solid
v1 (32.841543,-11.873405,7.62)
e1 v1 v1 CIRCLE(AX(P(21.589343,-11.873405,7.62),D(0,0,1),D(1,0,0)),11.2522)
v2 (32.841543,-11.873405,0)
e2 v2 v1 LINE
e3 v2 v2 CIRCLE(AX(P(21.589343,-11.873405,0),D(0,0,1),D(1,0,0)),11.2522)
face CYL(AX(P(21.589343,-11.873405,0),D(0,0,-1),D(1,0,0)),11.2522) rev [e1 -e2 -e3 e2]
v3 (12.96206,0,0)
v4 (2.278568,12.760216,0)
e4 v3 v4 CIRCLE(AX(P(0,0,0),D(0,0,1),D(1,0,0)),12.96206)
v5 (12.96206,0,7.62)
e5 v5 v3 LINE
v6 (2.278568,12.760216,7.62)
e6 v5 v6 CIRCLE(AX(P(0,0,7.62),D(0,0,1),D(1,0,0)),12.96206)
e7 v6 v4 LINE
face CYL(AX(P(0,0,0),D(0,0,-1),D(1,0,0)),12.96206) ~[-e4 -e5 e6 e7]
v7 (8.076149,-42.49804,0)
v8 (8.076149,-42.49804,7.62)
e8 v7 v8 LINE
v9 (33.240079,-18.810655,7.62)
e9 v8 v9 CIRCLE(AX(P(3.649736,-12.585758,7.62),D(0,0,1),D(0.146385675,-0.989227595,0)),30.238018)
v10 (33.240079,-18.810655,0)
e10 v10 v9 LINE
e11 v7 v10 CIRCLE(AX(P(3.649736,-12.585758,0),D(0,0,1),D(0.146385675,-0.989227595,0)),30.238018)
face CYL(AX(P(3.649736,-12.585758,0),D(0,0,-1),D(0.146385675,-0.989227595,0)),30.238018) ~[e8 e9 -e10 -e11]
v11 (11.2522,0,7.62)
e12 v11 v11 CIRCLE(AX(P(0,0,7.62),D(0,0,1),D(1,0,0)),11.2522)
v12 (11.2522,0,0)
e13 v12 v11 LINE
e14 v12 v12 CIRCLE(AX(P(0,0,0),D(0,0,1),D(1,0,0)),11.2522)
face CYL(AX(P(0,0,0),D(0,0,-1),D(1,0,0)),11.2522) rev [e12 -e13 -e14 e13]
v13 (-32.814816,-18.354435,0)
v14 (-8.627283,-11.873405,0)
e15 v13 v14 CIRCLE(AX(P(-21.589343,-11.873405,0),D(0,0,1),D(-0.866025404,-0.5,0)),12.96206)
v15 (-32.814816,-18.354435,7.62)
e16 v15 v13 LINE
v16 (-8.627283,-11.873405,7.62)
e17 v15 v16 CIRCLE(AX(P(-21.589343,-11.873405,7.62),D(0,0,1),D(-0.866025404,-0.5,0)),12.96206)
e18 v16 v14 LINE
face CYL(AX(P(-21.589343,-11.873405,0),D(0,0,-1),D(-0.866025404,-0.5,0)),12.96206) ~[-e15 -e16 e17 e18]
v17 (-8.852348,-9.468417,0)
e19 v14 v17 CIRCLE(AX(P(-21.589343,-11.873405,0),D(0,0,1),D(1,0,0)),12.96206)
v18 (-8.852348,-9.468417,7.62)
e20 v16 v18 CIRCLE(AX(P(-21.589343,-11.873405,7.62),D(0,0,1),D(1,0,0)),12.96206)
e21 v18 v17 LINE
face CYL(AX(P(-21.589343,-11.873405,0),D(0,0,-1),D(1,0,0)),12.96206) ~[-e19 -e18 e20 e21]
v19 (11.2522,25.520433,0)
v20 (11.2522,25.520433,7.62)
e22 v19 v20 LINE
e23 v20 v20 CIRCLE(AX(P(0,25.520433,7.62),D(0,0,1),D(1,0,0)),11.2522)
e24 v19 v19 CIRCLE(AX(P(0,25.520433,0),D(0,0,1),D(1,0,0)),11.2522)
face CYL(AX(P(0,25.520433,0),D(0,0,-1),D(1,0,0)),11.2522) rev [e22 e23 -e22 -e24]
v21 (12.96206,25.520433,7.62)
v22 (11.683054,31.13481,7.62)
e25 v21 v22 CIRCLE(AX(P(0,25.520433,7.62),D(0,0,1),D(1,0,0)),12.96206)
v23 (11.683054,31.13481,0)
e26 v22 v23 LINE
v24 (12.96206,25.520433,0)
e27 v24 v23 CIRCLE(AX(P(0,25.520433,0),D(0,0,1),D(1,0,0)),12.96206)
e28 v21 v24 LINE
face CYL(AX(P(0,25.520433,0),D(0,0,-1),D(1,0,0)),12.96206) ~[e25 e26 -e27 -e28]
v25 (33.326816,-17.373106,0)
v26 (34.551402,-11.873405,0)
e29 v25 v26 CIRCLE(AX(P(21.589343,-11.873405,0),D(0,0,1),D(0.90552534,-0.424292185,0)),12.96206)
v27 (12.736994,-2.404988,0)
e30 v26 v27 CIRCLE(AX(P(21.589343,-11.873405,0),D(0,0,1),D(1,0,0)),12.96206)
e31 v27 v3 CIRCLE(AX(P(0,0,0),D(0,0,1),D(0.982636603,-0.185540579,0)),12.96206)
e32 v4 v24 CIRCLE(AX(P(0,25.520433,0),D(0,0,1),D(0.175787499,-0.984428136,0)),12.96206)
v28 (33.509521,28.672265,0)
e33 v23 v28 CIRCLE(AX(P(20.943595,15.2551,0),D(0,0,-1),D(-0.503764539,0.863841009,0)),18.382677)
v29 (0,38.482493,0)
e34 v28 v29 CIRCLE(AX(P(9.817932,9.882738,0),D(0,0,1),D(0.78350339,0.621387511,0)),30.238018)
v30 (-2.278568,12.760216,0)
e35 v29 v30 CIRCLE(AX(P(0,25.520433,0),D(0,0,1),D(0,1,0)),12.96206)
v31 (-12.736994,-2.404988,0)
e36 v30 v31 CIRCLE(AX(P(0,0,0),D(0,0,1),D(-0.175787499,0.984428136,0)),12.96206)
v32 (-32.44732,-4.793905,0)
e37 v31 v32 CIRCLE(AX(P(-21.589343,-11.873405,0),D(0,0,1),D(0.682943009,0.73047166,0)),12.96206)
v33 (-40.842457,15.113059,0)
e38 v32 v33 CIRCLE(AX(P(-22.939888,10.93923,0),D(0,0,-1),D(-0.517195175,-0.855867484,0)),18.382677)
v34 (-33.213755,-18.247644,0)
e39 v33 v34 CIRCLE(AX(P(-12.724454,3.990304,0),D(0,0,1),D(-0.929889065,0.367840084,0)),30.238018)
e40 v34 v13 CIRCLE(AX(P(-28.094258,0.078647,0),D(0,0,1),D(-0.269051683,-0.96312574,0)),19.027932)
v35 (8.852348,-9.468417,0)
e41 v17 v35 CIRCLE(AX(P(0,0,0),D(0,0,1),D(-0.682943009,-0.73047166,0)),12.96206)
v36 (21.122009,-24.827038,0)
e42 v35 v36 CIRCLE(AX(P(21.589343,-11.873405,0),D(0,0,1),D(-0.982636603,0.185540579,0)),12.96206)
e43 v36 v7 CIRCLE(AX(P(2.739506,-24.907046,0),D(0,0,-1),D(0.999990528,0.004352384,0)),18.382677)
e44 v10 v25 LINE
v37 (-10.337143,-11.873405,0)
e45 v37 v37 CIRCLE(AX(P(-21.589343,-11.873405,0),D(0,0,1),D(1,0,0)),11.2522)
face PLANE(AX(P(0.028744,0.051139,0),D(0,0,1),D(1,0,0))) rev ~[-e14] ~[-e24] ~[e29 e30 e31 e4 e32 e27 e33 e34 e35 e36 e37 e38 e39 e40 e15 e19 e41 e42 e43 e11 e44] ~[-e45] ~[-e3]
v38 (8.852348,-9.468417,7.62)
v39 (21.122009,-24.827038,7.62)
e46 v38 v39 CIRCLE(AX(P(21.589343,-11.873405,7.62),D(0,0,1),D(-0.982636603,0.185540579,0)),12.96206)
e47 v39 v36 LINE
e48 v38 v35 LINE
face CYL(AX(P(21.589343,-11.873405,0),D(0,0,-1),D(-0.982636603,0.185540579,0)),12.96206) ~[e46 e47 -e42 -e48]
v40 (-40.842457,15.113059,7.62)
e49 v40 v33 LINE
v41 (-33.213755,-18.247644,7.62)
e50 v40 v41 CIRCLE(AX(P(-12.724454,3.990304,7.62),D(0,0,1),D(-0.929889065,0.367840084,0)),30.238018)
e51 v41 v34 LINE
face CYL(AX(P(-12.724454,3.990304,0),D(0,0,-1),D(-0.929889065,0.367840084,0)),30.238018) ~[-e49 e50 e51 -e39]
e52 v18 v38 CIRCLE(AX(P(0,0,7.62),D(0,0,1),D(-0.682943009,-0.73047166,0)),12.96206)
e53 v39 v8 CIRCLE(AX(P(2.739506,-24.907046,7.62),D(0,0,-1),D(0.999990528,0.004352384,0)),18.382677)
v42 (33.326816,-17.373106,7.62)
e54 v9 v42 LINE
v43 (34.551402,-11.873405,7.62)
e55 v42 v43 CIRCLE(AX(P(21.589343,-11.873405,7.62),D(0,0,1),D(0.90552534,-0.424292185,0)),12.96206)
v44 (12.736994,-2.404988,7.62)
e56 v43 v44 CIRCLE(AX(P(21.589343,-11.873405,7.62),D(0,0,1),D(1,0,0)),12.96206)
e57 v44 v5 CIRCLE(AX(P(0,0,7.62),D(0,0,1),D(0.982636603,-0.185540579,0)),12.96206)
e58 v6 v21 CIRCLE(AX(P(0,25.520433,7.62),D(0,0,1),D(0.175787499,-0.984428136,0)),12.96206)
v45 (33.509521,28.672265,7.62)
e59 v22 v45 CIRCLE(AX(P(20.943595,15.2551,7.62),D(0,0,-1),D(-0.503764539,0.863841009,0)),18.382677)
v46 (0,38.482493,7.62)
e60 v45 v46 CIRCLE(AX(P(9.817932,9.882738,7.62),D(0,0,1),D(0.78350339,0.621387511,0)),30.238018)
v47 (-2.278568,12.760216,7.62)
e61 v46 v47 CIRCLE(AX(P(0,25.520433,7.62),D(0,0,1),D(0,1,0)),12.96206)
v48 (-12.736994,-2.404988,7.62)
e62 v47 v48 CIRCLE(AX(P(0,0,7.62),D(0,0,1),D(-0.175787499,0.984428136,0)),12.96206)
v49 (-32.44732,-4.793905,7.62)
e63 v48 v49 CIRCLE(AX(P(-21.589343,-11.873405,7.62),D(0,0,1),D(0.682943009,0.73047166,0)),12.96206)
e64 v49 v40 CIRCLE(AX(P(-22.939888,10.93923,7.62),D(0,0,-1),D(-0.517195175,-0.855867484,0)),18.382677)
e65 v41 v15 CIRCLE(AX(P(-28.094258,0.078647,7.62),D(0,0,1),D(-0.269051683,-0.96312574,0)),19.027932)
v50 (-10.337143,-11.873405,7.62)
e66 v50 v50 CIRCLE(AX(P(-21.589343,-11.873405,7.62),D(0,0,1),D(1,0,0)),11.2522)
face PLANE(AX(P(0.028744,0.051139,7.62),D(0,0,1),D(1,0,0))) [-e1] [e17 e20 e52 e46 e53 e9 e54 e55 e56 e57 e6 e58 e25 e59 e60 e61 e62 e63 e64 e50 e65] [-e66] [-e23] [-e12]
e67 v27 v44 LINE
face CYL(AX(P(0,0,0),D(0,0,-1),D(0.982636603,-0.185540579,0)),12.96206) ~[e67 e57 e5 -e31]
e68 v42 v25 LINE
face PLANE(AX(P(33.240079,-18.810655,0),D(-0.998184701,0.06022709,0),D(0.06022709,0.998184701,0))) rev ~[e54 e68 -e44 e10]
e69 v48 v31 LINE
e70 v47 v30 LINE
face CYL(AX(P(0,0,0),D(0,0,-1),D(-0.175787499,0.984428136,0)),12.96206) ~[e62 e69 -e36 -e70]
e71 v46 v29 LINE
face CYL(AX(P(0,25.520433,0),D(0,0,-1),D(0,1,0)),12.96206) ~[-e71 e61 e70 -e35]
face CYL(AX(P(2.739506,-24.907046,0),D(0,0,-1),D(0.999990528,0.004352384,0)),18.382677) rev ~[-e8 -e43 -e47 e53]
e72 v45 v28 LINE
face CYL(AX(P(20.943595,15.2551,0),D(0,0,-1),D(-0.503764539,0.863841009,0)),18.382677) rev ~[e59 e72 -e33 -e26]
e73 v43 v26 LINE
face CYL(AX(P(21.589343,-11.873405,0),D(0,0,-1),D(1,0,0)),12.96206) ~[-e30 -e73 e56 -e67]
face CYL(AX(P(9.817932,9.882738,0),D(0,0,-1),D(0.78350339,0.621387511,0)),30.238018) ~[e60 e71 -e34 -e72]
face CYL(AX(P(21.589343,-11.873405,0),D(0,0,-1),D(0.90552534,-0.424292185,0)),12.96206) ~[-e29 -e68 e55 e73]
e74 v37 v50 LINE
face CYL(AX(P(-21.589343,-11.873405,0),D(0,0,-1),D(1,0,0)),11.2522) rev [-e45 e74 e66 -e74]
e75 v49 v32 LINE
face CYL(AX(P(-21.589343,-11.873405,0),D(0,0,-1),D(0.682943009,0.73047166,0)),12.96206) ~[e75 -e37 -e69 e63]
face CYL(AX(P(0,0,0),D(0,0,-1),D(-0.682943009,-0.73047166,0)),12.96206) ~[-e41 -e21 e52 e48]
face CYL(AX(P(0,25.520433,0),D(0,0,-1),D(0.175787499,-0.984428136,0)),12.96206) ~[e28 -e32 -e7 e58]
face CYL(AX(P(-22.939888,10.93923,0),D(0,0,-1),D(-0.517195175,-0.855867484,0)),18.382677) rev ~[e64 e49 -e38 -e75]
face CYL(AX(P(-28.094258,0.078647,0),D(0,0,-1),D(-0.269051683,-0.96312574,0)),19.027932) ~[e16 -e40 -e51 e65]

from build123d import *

# Parameters (mm, degrees)
F0_R     = 11.2522
F1_DEPTH = 7.62
F2_DEPTH = 5.334


with BuildPart() as f1:
    # F0 (on Top) → F1 (new body)
    with BuildSketch(Plane.XY):
        with BuildLine():
            ThreePointArc((12.7369944105, -2.4049880816), (12.9056707985, -1.2077481218), (12.962059801, 0))
            ThreePointArc((12.962059801, 0), (9.9385595014, 8.321059387), (2.2785680744, 12.7602163702))
            ThreePointArc((2.2785680744, 12.7602163702), (0, 12.5583729394), (-2.2785680744, 12.7602163702))
            ThreePointArc((-2.2785680744, 12.7602163702), (-10.6706436404, 7.3588286149), (-12.7369944105, -2.4049880816))
            ThreePointArc((-12.7369944105, -2.4049880816), (-10.231616704, -5.6270418202), (-8.8523481214, -9.4684173452))
            ThreePointArc((-8.8523481214, -9.4684173452), (0, -12.962059801), (8.8523481214, -9.4684173452))
            ThreePointArc((8.8523481214, -9.4684173452), (10.231616704, -5.6270418202), (12.7369944105, -2.4049880816))
        make_face()
        Circle(F0_R, mode=Mode.SUBTRACT)
        with BuildLine():
            ThreePointArc((-2.2785680744, 12.7602163702), (0, 12.5583729394), (2.2785680744, 12.7602163702))
            ThreePointArc((2.2785680744, 12.7602163702), (0, 12.962059801), (-2.2785680744, 12.7602163702))
        make_face()
        with BuildLine():
            ThreePointArc((-2.2785680744, 12.7602163702), (0, 12.962059801), (2.2785680744, 12.7602163702))
            ThreePointArc((2.2785680744, 12.7602163702), (9.9385595014, 17.1993733535), (12.962059801, 25.5204327404))
            ThreePointArc((12.962059801, 25.5204327404), (12.6382642104, 28.3995423305), (11.6830544332, 31.1348101232))
            ThreePointArc((11.6830544332, 31.1348101232), (6.9007644107, 36.492872981), (0, 38.4824925414))
            ThreePointArc((0, 38.4824925414), (-12.9115003379, 26.6641780399), (-2.2785680744, 12.7602163702))
        make_face()
        with Locations((0, 25.5204327404)):
            Circle(F0_R, mode=Mode.SUBTRACT)
        with BuildLine():
            ThreePointArc((34.5514023329, -11.8734054267), (26.7502692198, 0.0169196322), (12.7369944105, -2.4049880816))
            ThreePointArc((12.7369944105, -2.4049880816), (11.3577258278, -6.2463636065), (8.8523481214, -9.4684173452))
            ThreePointArc((8.8523481214, -9.4684173452), (11.4621329747, -19.9638084371), (21.1220092921, -24.8270378875))
            ThreePointArc((21.1220092921, -24.8270378875), (27.8669248008, -23.2139060833), (32.8148156049, -18.3544353272))
            ThreePointArc((32.8148156049, -18.3544353272), (33.0812954491, -17.869238349), (33.3268161418, -17.373106104))
            ThreePointArc((33.3268161418, -17.373106104), (34.2415524007, -14.6905990161), (34.5514023329, -11.8734054267))
        make_face()
        with Locations((21.5893425319, -11.8734054267)):
            Circle(F0_R, mode=Mode.SUBTRACT)
        with BuildLine():
            ThreePointArc((8.8523481214, -9.4684173452), (11.3577258278, -6.2463636065), (12.7369944105, -2.4049880816))
            ThreePointArc((12.7369944105, -2.4049880816), (10.231616704, -5.6270418202), (8.8523481214, -9.4684173452))
        make_face()
        with BuildLine():
            ThreePointArc((-8.8523481214, -9.4684173452), (-10.231616704, -5.6270418202), (-12.7369944105, -2.4049880816))
            ThreePointArc((-12.7369944105, -2.4049880816), (-11.3577258278, -6.2463636065), (-8.8523481214, -9.4684173452))
        make_face()
        with BuildLine():
            ThreePointArc((-8.8523481214, -9.4684173452), (-11.3577258278, -6.2463636065), (-12.7369944105, -2.4049880816))
            ThreePointArc((-12.7369944105, -2.4049880816), (-23.1489478225, 0.9944858388), (-32.4473199354, -4.7939053745))
            ThreePointArc((-32.4473199354, -4.7939053745), (-34.5466450824, -11.5222574559), (-32.8148156049, -18.3544353272))
            ThreePointArc((-32.8148156049, -18.3544353272), (-18.2345145916, -24.3937937504), (-8.6272827309, -11.8734054267))
            ThreePointArc((-8.6272827309, -11.8734054267), (-8.6836717334, -10.665657305), (-8.8523481214, -9.4684173452))
        make_face()
        with Locations((-21.5893425319, -11.8734054267)):
            Circle(F0_R, mode=Mode.SUBTRACT)
        with BuildLine():
            ThreePointArc((33.5095214822, 28.6722648172), (18.313797705, 38.902696715), (0, 38.4824925414))
            ThreePointArc((0, 38.4824925414), (6.9007644107, 36.492872981), (11.6830544332, 31.1348101232))
            ThreePointArc((11.6830544332, 31.1348101232), (23.0045235804, 33.5218836362), (33.5095214822, 28.6722648172))
        make_face()
        with BuildLine():
            ThreePointArc((32.8148156049, -18.3544353272), (27.8669248008, -23.2139060833), (21.1220092921, -24.8270378875))
            ThreePointArc((21.1220092921, -24.8270378875), (17.5285410214, -35.8252545336), (8.0761489747, -42.4980401738))
            ThreePointArc((8.0761489747, -42.4980401738), (24.3755164942, -34.6034732765), (33.2400792742, -18.8106554549))
            ThreePointArc((33.2400792742, -18.8106554549), (33.0293167827, -18.5808028908), (32.8148156049, -18.3544353272))
        make_face()
        with BuildLine():
            Line((33.2400792742, -18.8106554549), (33.3268161418, -17.373106104))
            ThreePointArc((33.3268161418, -17.373106104), (33.0812954491, -17.869238349), (32.8148156049, -18.3544353272))
            ThreePointArc((32.8148156049, -18.3544353272), (33.0293167827, -18.5808028908), (33.2400792742, -18.8106554549))
        make_face()
        with BuildLine():
            ThreePointArc((-32.8148156049, -18.3544353272), (-34.5466450824, -11.5222574559), (-32.4473199354, -4.7939053745))
            ThreePointArc((-32.4473199354, -4.7939053745), (-39.8779765619, 3.7961234456), (-40.8424568889, 15.1130590171))
            ThreePointArc((-40.8424568889, 15.1130590171), (-42.2015912045, -2.7503305518), (-33.2137545387, -18.2476440302))
            ThreePointArc((-33.2137545387, -18.2476440302), (-33.0145748071, -18.3021220393), (-32.8148156049, -18.3544353272))
        make_face()
    extrude(amount=F1_DEPTH)

    # F0 (on Top) → F2 (join)
    with BuildSketch(Plane.XY):
        with BuildLine():
            ThreePointArc((32.8148156049, -18.3544353272), (27.8669248008, -23.2139060833), (21.1220092921, -24.8270378875))
            ThreePointArc((21.1220092921, -24.8270378875), (17.5285410214, -35.8252545336), (8.0761489747, -42.4980401738))
            ThreePointArc((8.0761489747, -42.4980401738), (24.3755164942, -34.6034732765), (33.2400792742, -18.8106554549))
            ThreePointArc((33.2400792742, -18.8106554549), (33.0293167827, -18.5808028908), (32.8148156049, -18.3544353272))
        make_face()
        with BuildLine():
            ThreePointArc((-32.8148156049, -18.3544353272), (-34.5466450824, -11.5222574559), (-32.4473199354, -4.7939053745))
            ThreePointArc((-32.4473199354, -4.7939053745), (-39.8779765619, 3.7961234456), (-40.8424568889, 15.1130590171))
            ThreePointArc((-40.8424568889, 15.1130590171), (-42.2015912045, -2.7503305518), (-33.2137545387, -18.2476440302))
            ThreePointArc((-33.2137545387, -18.2476440302), (-33.0145748071, -18.3021220393), (-32.8148156049, -18.3544353272))
        make_face()
        with BuildLine():
            ThreePointArc((33.5095214822, 28.6722648172), (18.313797705, 38.902696715), (0, 38.4824925414))
            ThreePointArc((0, 38.4824925414), (6.9007644107, 36.492872981), (11.6830544332, 31.1348101232))
            ThreePointArc((11.6830544332, 31.1348101232), (23.0045235804, 33.5218836362), (33.5095214822, 28.6722648172))
        make_face()
        with BuildLine():
            ThreePointArc((-2.2785680744, 12.7602163702), (0, 12.962059801), (2.2785680744, 12.7602163702))
            ThreePointArc((2.2785680744, 12.7602163702), (9.9385595014, 17.1993733535), (12.962059801, 25.5204327404))
            ThreePointArc((12.962059801, 25.5204327404), (12.6382642104, 28.3995423305), (11.6830544332, 31.1348101232))
            ThreePointArc((11.6830544332, 31.1348101232), (6.9007644107, 36.492872981), (0, 38.4824925414))
            ThreePointArc((0, 38.4824925414), (-12.9115003379, 26.6641780399), (-2.2785680744, 12.7602163702))
        make_face()
        with Locations((0, 25.5204327404)):
            Circle(F0_R, mode=Mode.SUBTRACT)
        with BuildLine():
            ThreePointArc((12.7369944105, -2.4049880816), (12.9056707985, -1.2077481218), (12.962059801, 0))
            ThreePointArc((12.962059801, 0), (9.9385595014, 8.321059387), (2.2785680744, 12.7602163702))
            ThreePointArc((2.2785680744, 12.7602163702), (0, 12.5583729394), (-2.2785680744, 12.7602163702))
            ThreePointArc((-2.2785680744, 12.7602163702), (-10.6706436404, 7.3588286149), (-12.7369944105, -2.4049880816))
            ThreePointArc((-12.7369944105, -2.4049880816), (-10.231616704, -5.6270418202), (-8.8523481214, -9.4684173452))
            ThreePointArc((-8.8523481214, -9.4684173452), (0, -12.962059801), (8.8523481214, -9.4684173452))
            ThreePointArc((8.8523481214, -9.4684173452), (10.231616704, -5.6270418202), (12.7369944105, -2.4049880816))
        make_face()
        Circle(F0_R, mode=Mode.SUBTRACT)
        with BuildLine():
            ThreePointArc((34.5514023329, -11.8734054267), (26.7502692198, 0.0169196322), (12.7369944105, -2.4049880816))
            ThreePointArc((12.7369944105, -2.4049880816), (11.3577258278, -6.2463636065), (8.8523481214, -9.4684173452))
            ThreePointArc((8.8523481214, -9.4684173452), (11.4621329747, -19.9638084371), (21.1220092921, -24.8270378875))
            ThreePointArc((21.1220092921, -24.8270378875), (27.8669248008, -23.2139060833), (32.8148156049, -18.3544353272))
            ThreePointArc((32.8148156049, -18.3544353272), (33.0812954491, -17.869238349), (33.3268161418, -17.373106104))
            ThreePointArc((33.3268161418, -17.373106104), (34.2415524007, -14.6905990161), (34.5514023329, -11.8734054267))
        make_face()
        with Locations((21.5893425319, -11.8734054267)):
            Circle(F0_R, mode=Mode.SUBTRACT)
        with BuildLine():
            ThreePointArc((8.8523481214, -9.4684173452), (11.3577258278, -6.2463636065), (12.7369944105, -2.4049880816))
            ThreePointArc((12.7369944105, -2.4049880816), (10.231616704, -5.6270418202), (8.8523481214, -9.4684173452))
        make_face()
        with BuildLine():
            ThreePointArc((-2.2785680744, 12.7602163702), (0, 12.5583729394), (2.2785680744, 12.7602163702))
            ThreePointArc((2.2785680744, 12.7602163702), (0, 12.962059801), (-2.2785680744, 12.7602163702))
        make_face()
        with BuildLine():
            ThreePointArc((-8.8523481214, -9.4684173452), (-10.231616704, -5.6270418202), (-12.7369944105, -2.4049880816))
            ThreePointArc((-12.7369944105, -2.4049880816), (-11.3577258278, -6.2463636065), (-8.8523481214, -9.4684173452))
        make_face()
        with BuildLine():
            ThreePointArc((-8.8523481214, -9.4684173452), (-11.3577258278, -6.2463636065), (-12.7369944105, -2.4049880816))
            ThreePointArc((-12.7369944105, -2.4049880816), (-23.1489478225, 0.9944858388), (-32.4473199354, -4.7939053745))
            ThreePointArc((-32.4473199354, -4.7939053745), (-34.5466450824, -11.5222574559), (-32.8148156049, -18.3544353272))
            ThreePointArc((-32.8148156049, -18.3544353272), (-18.2345145916, -24.3937937504), (-8.6272827309, -11.8734054267))
            ThreePointArc((-8.6272827309, -11.8734054267), (-8.6836717334, -10.665657305), (-8.8523481214, -9.4684173452))
        make_face()
        with Locations((-21.5893425319, -11.8734054267)):
            Circle(F0_R, mode=Mode.SUBTRACT)
    extrude(amount=F2_DEPTH)


solid = f1.part
